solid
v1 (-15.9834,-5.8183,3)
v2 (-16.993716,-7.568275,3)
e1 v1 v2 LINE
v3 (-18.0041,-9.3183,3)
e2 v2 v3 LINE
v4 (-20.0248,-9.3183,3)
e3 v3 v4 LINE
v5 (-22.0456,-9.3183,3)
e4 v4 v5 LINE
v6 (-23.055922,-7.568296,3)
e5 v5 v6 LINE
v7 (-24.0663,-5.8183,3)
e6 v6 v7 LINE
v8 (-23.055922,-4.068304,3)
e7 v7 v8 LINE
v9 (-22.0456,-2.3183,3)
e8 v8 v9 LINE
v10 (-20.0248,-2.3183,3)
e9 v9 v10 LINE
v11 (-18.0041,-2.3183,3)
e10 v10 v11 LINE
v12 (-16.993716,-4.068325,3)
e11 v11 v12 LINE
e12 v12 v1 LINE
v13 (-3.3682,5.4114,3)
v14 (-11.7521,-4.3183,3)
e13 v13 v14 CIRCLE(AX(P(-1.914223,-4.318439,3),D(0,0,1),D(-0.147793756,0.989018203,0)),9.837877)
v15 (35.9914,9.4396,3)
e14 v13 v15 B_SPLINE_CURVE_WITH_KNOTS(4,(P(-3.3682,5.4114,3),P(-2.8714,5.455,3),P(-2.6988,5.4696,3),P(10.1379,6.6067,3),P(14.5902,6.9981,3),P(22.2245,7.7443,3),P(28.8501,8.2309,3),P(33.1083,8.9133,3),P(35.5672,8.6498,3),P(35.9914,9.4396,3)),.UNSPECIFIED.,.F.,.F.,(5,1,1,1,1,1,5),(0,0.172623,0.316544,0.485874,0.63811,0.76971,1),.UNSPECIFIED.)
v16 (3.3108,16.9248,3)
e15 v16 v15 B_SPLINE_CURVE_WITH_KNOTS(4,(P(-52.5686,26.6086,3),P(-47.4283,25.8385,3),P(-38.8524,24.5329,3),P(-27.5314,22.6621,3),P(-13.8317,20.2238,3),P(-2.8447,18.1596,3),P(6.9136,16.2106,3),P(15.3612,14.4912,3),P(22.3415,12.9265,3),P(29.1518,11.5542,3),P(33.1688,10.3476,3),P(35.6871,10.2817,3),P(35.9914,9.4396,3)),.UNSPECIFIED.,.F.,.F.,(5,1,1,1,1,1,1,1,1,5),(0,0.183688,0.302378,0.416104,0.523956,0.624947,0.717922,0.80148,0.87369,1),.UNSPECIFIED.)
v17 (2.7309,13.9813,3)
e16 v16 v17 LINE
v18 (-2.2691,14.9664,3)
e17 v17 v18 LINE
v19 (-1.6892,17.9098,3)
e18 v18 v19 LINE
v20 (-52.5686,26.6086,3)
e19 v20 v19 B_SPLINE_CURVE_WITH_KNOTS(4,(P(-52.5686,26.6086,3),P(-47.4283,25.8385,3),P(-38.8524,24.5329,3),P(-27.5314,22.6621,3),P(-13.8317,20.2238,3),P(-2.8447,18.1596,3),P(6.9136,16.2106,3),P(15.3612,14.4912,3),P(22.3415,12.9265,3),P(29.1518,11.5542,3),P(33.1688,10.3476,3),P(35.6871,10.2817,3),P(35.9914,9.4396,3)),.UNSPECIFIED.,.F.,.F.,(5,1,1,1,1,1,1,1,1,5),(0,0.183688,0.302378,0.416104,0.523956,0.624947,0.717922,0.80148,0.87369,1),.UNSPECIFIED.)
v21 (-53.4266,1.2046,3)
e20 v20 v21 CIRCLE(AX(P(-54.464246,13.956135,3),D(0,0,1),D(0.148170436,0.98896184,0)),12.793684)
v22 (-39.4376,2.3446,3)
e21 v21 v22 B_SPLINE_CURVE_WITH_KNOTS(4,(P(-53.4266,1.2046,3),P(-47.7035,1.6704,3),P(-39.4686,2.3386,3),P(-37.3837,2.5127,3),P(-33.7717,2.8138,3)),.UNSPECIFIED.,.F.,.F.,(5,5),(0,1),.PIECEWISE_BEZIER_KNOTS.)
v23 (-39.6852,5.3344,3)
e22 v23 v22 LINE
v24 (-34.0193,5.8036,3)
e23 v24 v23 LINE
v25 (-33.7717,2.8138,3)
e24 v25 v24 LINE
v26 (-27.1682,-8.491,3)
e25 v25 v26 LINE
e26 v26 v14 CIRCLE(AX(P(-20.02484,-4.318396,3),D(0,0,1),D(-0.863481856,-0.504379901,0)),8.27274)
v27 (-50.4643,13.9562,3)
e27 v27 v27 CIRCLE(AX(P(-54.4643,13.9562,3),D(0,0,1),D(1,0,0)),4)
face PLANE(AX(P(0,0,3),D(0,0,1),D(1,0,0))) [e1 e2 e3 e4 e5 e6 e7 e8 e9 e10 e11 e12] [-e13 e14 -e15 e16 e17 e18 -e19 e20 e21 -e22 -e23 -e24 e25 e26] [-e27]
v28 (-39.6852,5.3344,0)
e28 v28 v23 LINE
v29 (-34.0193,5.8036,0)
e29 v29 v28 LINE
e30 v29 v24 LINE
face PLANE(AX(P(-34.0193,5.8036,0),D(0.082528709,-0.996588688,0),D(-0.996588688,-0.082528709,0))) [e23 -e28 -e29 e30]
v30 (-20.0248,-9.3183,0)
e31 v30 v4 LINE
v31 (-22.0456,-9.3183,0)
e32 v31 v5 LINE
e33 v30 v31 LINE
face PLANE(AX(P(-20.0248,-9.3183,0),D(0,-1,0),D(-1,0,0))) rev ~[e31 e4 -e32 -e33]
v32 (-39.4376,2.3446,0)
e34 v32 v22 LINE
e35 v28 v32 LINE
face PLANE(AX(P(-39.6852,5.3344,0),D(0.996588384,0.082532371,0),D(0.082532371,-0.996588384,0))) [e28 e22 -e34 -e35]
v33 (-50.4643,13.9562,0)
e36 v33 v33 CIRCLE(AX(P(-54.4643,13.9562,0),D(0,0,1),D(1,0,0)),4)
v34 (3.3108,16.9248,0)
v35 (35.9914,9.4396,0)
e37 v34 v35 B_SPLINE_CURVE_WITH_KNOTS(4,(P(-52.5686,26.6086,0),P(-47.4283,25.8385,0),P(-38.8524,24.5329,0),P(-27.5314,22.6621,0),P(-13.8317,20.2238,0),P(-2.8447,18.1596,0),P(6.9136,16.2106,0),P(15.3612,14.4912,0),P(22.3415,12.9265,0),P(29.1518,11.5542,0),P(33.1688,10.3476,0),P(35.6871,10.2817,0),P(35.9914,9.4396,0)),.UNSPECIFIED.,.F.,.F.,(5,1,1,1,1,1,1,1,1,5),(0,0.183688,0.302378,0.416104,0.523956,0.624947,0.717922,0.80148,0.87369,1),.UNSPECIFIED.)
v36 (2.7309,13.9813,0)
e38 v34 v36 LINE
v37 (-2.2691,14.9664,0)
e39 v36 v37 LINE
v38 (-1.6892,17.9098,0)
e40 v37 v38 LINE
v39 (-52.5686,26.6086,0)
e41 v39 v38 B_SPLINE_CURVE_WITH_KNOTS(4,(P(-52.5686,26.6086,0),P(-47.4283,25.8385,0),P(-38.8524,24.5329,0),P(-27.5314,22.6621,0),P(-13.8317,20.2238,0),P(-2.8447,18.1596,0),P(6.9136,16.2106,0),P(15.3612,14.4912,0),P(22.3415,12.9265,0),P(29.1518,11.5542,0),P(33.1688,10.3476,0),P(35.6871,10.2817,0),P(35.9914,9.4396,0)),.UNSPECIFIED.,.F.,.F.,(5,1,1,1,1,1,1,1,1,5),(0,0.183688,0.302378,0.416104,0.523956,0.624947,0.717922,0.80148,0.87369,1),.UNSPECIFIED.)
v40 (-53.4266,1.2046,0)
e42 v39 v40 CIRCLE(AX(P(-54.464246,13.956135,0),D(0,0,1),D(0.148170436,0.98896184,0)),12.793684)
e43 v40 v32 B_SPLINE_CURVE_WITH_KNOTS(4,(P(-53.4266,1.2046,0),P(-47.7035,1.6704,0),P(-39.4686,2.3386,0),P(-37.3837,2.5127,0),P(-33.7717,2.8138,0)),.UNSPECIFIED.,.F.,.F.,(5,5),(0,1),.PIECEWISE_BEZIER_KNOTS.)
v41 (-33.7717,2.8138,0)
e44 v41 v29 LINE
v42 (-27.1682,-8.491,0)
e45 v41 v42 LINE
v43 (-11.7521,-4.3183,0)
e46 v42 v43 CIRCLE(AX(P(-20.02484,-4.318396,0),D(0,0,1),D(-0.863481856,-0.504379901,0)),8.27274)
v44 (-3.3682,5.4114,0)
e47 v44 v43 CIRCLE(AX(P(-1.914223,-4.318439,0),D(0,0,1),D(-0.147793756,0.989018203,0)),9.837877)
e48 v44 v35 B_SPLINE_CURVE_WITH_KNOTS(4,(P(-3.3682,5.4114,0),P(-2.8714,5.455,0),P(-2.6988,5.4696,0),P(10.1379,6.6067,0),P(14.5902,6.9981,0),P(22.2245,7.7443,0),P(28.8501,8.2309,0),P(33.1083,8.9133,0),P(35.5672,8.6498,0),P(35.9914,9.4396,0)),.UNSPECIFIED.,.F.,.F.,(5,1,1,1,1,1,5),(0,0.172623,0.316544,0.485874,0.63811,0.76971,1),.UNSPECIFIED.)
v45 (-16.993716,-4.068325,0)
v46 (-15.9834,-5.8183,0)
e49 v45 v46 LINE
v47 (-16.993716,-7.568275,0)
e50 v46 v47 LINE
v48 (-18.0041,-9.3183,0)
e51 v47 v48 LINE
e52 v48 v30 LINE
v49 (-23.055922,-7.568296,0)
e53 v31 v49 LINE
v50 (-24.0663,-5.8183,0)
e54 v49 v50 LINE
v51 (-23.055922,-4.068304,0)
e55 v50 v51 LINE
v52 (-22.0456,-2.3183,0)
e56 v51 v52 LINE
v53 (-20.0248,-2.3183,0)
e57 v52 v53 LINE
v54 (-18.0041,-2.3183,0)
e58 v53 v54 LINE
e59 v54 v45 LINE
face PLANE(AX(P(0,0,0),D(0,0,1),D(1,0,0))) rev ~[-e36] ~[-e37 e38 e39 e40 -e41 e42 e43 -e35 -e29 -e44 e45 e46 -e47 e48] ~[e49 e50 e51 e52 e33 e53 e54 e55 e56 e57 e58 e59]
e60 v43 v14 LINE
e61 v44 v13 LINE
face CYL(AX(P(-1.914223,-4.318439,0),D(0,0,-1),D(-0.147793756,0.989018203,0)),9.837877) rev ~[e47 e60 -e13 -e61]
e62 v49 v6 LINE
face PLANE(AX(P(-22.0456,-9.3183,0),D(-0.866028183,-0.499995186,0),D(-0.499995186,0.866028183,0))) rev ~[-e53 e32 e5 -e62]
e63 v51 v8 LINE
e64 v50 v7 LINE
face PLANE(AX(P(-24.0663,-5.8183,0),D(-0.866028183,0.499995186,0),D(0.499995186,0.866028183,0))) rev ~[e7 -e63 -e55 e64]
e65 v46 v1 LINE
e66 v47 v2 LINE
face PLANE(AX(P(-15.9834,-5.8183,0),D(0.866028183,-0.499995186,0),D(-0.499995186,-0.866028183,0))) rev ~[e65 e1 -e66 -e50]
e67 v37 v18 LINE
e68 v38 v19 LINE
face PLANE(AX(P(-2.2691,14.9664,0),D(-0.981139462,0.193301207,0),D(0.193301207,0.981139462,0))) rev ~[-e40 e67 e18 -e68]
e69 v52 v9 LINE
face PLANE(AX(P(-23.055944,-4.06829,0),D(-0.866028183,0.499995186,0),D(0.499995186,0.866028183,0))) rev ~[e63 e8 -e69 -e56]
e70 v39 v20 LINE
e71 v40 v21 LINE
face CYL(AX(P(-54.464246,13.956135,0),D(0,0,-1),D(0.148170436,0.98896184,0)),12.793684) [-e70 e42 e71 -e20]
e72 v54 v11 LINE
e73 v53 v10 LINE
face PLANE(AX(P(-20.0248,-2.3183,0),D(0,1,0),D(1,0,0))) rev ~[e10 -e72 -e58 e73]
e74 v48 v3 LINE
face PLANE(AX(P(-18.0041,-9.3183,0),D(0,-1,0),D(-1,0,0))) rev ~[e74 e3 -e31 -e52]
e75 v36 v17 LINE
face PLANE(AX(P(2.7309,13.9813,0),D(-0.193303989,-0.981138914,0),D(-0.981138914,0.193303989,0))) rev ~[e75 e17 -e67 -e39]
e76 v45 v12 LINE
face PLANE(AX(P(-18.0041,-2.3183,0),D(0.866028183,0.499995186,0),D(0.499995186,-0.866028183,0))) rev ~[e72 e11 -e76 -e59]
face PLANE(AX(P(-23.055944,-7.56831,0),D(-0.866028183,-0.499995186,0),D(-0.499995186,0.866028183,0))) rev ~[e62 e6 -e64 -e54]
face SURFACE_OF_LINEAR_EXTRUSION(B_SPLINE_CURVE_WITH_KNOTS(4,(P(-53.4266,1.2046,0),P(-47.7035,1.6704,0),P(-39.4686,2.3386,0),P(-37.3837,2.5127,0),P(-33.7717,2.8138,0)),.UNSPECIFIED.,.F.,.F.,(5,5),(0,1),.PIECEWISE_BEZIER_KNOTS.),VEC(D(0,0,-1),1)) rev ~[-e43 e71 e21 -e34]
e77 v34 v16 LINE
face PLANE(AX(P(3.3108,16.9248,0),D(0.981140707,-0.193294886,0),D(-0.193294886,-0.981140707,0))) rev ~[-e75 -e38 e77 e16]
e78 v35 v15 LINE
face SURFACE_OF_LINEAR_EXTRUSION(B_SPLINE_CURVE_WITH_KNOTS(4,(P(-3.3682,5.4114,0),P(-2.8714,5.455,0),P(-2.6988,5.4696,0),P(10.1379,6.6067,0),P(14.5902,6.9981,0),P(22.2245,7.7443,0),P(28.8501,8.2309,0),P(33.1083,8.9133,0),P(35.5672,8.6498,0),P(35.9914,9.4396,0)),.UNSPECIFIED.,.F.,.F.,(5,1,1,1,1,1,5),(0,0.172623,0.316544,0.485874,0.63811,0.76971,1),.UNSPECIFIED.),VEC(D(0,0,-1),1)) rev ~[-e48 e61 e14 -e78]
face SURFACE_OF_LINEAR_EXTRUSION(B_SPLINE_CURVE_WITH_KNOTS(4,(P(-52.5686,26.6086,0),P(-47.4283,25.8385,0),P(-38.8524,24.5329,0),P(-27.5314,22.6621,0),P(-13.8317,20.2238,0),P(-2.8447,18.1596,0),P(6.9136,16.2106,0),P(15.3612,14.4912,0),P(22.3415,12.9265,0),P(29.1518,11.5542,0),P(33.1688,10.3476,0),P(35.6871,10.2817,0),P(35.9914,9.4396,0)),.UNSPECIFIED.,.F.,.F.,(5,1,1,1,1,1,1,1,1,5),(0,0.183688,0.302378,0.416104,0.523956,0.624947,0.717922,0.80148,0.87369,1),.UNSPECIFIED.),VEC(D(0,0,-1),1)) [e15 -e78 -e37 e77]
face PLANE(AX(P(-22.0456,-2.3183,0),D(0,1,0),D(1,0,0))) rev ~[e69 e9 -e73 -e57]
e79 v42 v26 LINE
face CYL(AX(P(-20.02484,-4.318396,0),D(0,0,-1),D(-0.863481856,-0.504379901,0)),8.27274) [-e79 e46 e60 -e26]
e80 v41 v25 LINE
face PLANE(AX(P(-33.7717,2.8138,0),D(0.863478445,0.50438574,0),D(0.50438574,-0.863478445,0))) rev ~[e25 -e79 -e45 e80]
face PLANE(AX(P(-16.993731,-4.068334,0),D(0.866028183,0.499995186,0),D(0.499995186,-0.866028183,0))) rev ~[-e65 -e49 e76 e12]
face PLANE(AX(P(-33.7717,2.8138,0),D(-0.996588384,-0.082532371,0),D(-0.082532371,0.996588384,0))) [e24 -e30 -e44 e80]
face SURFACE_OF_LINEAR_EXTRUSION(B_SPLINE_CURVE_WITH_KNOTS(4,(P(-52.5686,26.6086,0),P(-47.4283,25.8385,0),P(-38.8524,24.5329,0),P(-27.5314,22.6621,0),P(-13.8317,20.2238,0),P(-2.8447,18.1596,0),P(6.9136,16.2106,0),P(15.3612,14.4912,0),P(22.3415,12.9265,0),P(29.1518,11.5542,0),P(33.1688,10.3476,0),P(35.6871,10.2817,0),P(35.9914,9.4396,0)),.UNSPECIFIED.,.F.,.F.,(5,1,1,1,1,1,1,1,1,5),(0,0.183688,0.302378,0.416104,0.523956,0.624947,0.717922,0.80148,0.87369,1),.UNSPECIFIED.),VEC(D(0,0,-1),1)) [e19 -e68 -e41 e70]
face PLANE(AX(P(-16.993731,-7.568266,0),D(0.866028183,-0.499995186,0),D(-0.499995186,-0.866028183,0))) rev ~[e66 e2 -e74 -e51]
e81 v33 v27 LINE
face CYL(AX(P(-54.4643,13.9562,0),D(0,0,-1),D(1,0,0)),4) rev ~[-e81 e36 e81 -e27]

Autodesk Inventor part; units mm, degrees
ref_plane "YZ Plane" through (0, 0, 0) normal (1, 0, 0) x (0, 1, 0)
ref_plane "XZ Plane" through (0, 0, 0) normal (0, 1, 0) x (-1, 0, 0)
ref_plane "XY Plane" through (0, 0, 0) normal (0, 0, 1) x (1, 0, 0)
sketch "Sketch1" plane through (0, 0, 0) normal (0, 0, 1) x (1, 0, 0)
  spline S0 degree 2 poles (-40.9982, 18.5994) (-40.8895, 18.5833) (-40.7809, 18.5671) knots 0 0 0 1 1 1
  line L0 (-40.803, 18.5704) -> (-40.7587, 18.5638) construction
  arc A0 (-40.7631, 18.5645) -> (-40.7986, 18.5698) centre (-56.3605, -86.2568) ccw construction
  line L1 (-39.6852, 5.3344) -> (-39.4376, 2.3446)
  line L2 (-39.4376, 2.3446) -> (-33.7717, 2.8138)
  line L3 (-33.7717, 2.8138) -> (-34.0193, 5.8036)
  line L4 (-2.2691, 14.9664) -> (-1.6892, 17.9098)
  line L5 (2.7309, 13.9813) -> (-2.2691, 14.9664)
  line L6 (3.3108, 16.9248) -> (2.7309, 13.9813)
  line L7 (-1.6892, 17.9098) -> (3.3108, 16.9248)
  spline S1 degree 4 poles (-52.5686, 26.6086) (-47.4283, 25.8385) (-38.8524, 24.5329) (-27.5314, 22.6621) (-13.8317, 20.2238) (-2.8447, 18.1596) (6.9136, 16.2106) (15.3612, 14.4912) (22.3415, 12.9265) (29.1518, 11.5542) (33.1688, 10.3476) (35.6871, 10.2817) (35.9914, 9.4396) knots 0 0 0 0 0 0.183688 0.302378 0.416104 0.523956 0.624947 0.717922 0.80148 0.87369 1 1 1 1 1
  line L8 (-34.0193, 5.8036) -> (-39.6852, 5.3344)
  arc A1 (-52.5686, 26.6086) -> (-53.4266, 1.2046) centre (-54.4643, 13.9562) ccw
  circle A2 centre (-54.4643, 13.9562) radius 4
  circle A3 centre (-20.0248, -5.8183) radius 3.5
  line L9 (-33.7717, 2.8138) -> (-27.1682, -8.491)
  arc A4 (-3.3682, 5.4114) -> (-11.7521, -4.3183) centre (-1.9143, -4.3183) ccw
  arc A5 (-27.1682, -8.491) -> (-11.7521, -4.3183) centre (-20.0248, -4.3183) ccw
  spline S2 degree 4 poles (-53.4266, 1.2046) (-47.7035, 1.6704) (-39.4686, 2.3386) (-37.3837, 2.5127) (-33.7717, 2.8138) knots 0 0 0 0 0 1 1 1 1 1
  line L10 (-35.7599, 2.6481) -> (-31.7835, 2.9795) construction
  arc A6 (-32.1812, 2.9462) -> (-35.3623, 2.6811) centre (796.8879, -9962.6267) ccw construction
  spline S3 degree 4 poles (-3.3682, 5.4114) (-2.8714, 5.455) (-2.6988, 5.4696) (10.1379, 6.6067) (14.5902, 6.9981) (22.2245, 7.7443) (28.8501, 8.2309) (33.1083, 8.9133) (35.5672, 8.6498) (35.9914, 9.4396) knots 0 0 0 0 0 0.172623 0.316544 0.485874 0.63811 0.76971 1 1 1 1 1
  line L11 (-7.9773, 5.0072) -> (1.2409, 5.8157) construction
  arc A7 (0.3196, 5.7283) -> (-7.0549, 5.0815) centre (88.3466, -1040.3487) ccw construction
  line L12 (70.0994, 77.6585) -> (70.0994, -40.6368)
  line L13 (142.4679, 14.9664) -> (141.888, 17.9098)
  line L14 (137.4679, 13.9813) -> (142.4679, 14.9664)
  line L15 (136.888, 16.9248) -> (137.4679, 13.9813)
  line L16 (141.888, 17.9098) -> (136.888, 16.9248)
  spline S4 degree 4 poles (192.7674, 26.6086) (187.6271, 25.8385) (179.0512, 24.5329) (167.7302, 22.6621) (154.0305, 20.2238) (143.0435, 18.1596) (133.2852, 16.2106) (124.8376, 14.4912) (117.8573, 12.9265) (111.047, 11.5542) (107.03, 10.3476) (104.5117, 10.2817) (104.2074, 9.4396) knots 0 0 0 0 0 0.183688 0.302378 0.416104 0.523956 0.624947 0.717922 0.80148 0.87369 1 1 1 1 1
  spline S5 degree 2 poles (181.197, 18.5994) (181.0883, 18.5833) (180.9797, 18.5671) knots 0 0 0 1 1 1
  line L17 (181.0018, 18.5704) -> (180.9575, 18.5638) construction
  arc A8 (180.9974, 18.5698) -> (180.9619, 18.5645) centre (196.5593, -86.2568) ccw construction
  line L18 (173.9705, 2.8138) -> (174.2181, 5.8036)
  line L19 (174.2181, 5.8036) -> (179.8839, 5.3344)
  line L20 (179.8839, 5.3344) -> (179.6364, 2.3446)
  line L21 (179.6364, 2.3446) -> (173.9705, 2.8138)
  arc A9 (193.6254, 1.2046) -> (192.7674, 26.6086) centre (194.6631, 13.9562) ccw
  circle A10 centre (194.6631, 13.9562) radius 4
  circle A11 centre (160.2236, -5.8183) radius 3.5
  line L22 (173.9705, 2.8138) -> (167.367, -8.491)
  arc A12 (151.9509, -4.3183) -> (143.567, 5.4114) centre (142.1131, -4.3183) ccw
  arc A13 (161.3154, 3.8821) -> (160.5367, 3.9485) centre (160.2236, -4.3183) ccw
  arc A14 (151.9509, -4.3183) -> (167.367, -8.491) centre (160.2236, -4.3183) ccw
  line L23 (175.9587, 2.6481) -> (171.9823, 2.9795) construction
  arc A15 (175.5611, 2.6811) -> (172.38, 2.9462) centre (-656.6891, -9962.6267) ccw construction
  spline S6 degree 4 poles (193.6254, 1.2046) (187.9023, 1.6704) (179.6674, 2.3386) (177.5825, 2.5127) (173.9705, 2.8138) knots 0 0 0 0 0 1 1 1 1 1
  spline S7 degree 1 poles (161.3154, 3.8821) (160.5367, 3.9485) knots 0 0 1 1
  spline S8 degree 4 poles (143.567, 5.4114) (143.0702, 5.455) (142.8976, 5.4696) (130.0609, 6.6067) (125.6086, 6.9981) (117.9743, 7.7443) (111.3487, 8.2309) (107.0905, 8.9133) (104.6315, 8.6498) (104.2074, 9.4396) knots 0 0 0 0 0 0.172623 0.316544 0.485874 0.63811 0.76971 1 1 1 1 1
  line L24 (148.1761, 5.0072) -> (138.9579, 5.8157) construction
  arc A16 (147.2537, 5.0815) -> (139.8792, 5.7283) centre (51.8522, -1040.3487) ccw construction
  line L25 (-15.9834, -5.8183) -> (-18.0041, -9.3183)
  line L26 (-18.0041, -9.3183) -> (-22.0456, -9.3183)
  line L27 (-22.0456, -9.3183) -> (-24.0663, -5.8183)
  line L28 (-24.0663, -5.8183) -> (-22.0456, -2.3183)
  line L29 (-22.0456, -2.3183) -> (-18.0041, -2.3183)
  line L30 (-18.0041, -2.3183) -> (-15.9834, -5.8183)
  point P0 (0, 0)
  point P1 (-17.9436, 10.4444)
  point P2 (-26.2526, 3.4456)
  point P3 (-14.0156, 4.4896)
  point P4 (15.6814, 7.1116)
  point P5 (22.8694, 7.7686)
  point P6 (28.5454, 8.2966)
  point P7 (32.6494, 8.6836)
  point P8 (35.1304, 8.9206)
  point P9 (-38.5796, 24.4516)
  point P10 (-25.4276, 22.2616)
  point P11 (-13.2626, 20.0956)
  point P12 (-2.2076, 18.0106)
  point P13 (7.6174, 16.0606)
  point P14 (16.1074, 14.2996)
  point P15 (23.1784, 12.7756)
  point P16 (28.7524, 11.5396)
  point P17 (32.7784, 10.6276)
  point P18 (35.2084, 10.0696)
  point P19 (-67.2506, 14.3918)
  point P20 (-5.9186, 11.5242)
  point P21 (-6.911, 11.4294)
  point P22 (-8.5526, 11.2746)
  point P23 (-10.823, 11.0634)
  point P24 (-13.6982, 10.8006)
  point P25 (-17.1422, 10.4898)
  point P26 (-21.1166, 10.1382)
  point P27 (-25.577, 9.7518)
  point P28 (-30.4718, 9.3342)
  point P29 (-35.7458, 8.8938)
  point P30 (-5.8874, 11.9838)
  point P31 (-6.8594, 12.207)
  point P32 (-8.4698, 12.5718)
  point P33 (-10.6994, 13.0662)
  point P34 (-13.5278, 13.6758)
  point P35 (-16.9238, 14.3802)
  point P36 (-20.8538, 15.1602)
  point P37 (-25.2758, 15.9942)
  point P38 (-30.1418, 16.8606)
  point P39 (-35.4026, 17.7366)
  point P40 (-5.5742, 11.7318)
  point P41 (-41.3414, 8.4378)
  point P42 (35.2084, 9.4987)
  point P43 (32.7784, 9.6618)
  point P44 (28.7524, 9.9279)
  point P45 (23.1784, 10.2865)
  point P46 (16.1074, 10.7251)
  point P47 (7.6174, 11.2223)
  point P48 (-2.2076, 11.7622)
  point P49 (-13.2626, 12.3252)
  point P50 (-25.4276, 12.8888)
  point P51 (-38.5796, 13.434)
  point P52 (-52.5686, 13.9416)
  point P53 (35.9914, 8.9986)
  point P54 (-68.0606, 0.0436)
  point P55 (-67.2506, 28.6756)
  point P56 (35.9914, 9.8806)
  point P57 (140.1988, 0)
  point P58 (158.1424, 10.4444)
  point P59 (178.7784, 24.4516)
  point P60 (165.6264, 22.2616)
  point P61 (153.4614, 20.0956)
  point P62 (142.4064, 18.0106)
  point P63 (132.5814, 16.0606)
  point P64 (124.0914, 14.2996)
  point P65 (117.0204, 12.7756)
  point P66 (111.4464, 11.5396)
  point P67 (107.4204, 10.6276)
  point P68 (104.9904, 10.0696)
  point P69 (166.4514, 3.4456)
  point P70 (154.2144, 4.4896)
  point P71 (124.5174, 7.1116)
  point P72 (117.3294, 7.7686)
  point P73 (111.6534, 8.2966)
  point P74 (107.5494, 8.6836)
  point P75 (105.0684, 8.9206)
  point P76 (207.4494, 14.3918)
  point P77 (104.2074, 9.8806)
  point P78 (207.4494, 28.6756)
  point P79 (208.2594, 0.0436)
  point P80 (104.2074, 8.9986)
  point P81 (192.7674, 13.9416)
  point P82 (178.7784, 13.434)
  point P83 (165.6264, 12.8888)
  point P84 (153.4614, 12.3252)
  point P85 (142.4064, 11.7622)
  point P86 (132.5814, 11.2223)
  point P87 (124.0914, 10.7251)
  point P88 (117.0204, 10.2865)
  point P89 (111.4464, 9.9279)
  point P90 (107.4204, 9.6618)
  point P91 (104.9904, 9.4987)
  point P92 (181.5402, 8.4378)
  point P93 (145.773, 11.7318)
  point P94 (175.6014, 17.7366)
  point P95 (170.3406, 16.8606)
  point P96 (165.4746, 15.9942)
  point P97 (161.0526, 15.1602)
  point P98 (157.1226, 14.3802)
  point P99 (153.7266, 13.6758)
  point P100 (150.8982, 13.0662)
  point P101 (148.6686, 12.5718)
  point P102 (147.0582, 12.207)
  point P103 (146.0862, 11.9838)
  point P104 (175.9446, 8.8938)
  point P105 (170.6706, 9.3342)
  point P106 (165.7758, 9.7518)
  point P107 (161.3154, 10.1382)
  point P108 (157.341, 10.4898)
  point P109 (153.897, 10.8006)
  point P110 (151.0218, 11.0634)
  point P111 (148.7514, 11.2746)
  point P112 (147.1098, 11.4294)
  point P113 (146.1174, 11.5242)
  dimension "d0" = 3
  dimension "d1" = 5
  dimension "d2" = 52.7751
  dimension "d3" = 3
  dimension "d4" = 5.6658
  dimension "d9" = 8
  dimension "d11" = 7
extrude "Extrusion2" add sketch "Sketch1" along normal blind 3 contours L1 S2 A1 S1 L4 L5 L6 S3 A4 A5 L9 L3 L8
properties part number "2P.03.01.08.JW.AileronRibMid" material "Wood (Walnut)"
